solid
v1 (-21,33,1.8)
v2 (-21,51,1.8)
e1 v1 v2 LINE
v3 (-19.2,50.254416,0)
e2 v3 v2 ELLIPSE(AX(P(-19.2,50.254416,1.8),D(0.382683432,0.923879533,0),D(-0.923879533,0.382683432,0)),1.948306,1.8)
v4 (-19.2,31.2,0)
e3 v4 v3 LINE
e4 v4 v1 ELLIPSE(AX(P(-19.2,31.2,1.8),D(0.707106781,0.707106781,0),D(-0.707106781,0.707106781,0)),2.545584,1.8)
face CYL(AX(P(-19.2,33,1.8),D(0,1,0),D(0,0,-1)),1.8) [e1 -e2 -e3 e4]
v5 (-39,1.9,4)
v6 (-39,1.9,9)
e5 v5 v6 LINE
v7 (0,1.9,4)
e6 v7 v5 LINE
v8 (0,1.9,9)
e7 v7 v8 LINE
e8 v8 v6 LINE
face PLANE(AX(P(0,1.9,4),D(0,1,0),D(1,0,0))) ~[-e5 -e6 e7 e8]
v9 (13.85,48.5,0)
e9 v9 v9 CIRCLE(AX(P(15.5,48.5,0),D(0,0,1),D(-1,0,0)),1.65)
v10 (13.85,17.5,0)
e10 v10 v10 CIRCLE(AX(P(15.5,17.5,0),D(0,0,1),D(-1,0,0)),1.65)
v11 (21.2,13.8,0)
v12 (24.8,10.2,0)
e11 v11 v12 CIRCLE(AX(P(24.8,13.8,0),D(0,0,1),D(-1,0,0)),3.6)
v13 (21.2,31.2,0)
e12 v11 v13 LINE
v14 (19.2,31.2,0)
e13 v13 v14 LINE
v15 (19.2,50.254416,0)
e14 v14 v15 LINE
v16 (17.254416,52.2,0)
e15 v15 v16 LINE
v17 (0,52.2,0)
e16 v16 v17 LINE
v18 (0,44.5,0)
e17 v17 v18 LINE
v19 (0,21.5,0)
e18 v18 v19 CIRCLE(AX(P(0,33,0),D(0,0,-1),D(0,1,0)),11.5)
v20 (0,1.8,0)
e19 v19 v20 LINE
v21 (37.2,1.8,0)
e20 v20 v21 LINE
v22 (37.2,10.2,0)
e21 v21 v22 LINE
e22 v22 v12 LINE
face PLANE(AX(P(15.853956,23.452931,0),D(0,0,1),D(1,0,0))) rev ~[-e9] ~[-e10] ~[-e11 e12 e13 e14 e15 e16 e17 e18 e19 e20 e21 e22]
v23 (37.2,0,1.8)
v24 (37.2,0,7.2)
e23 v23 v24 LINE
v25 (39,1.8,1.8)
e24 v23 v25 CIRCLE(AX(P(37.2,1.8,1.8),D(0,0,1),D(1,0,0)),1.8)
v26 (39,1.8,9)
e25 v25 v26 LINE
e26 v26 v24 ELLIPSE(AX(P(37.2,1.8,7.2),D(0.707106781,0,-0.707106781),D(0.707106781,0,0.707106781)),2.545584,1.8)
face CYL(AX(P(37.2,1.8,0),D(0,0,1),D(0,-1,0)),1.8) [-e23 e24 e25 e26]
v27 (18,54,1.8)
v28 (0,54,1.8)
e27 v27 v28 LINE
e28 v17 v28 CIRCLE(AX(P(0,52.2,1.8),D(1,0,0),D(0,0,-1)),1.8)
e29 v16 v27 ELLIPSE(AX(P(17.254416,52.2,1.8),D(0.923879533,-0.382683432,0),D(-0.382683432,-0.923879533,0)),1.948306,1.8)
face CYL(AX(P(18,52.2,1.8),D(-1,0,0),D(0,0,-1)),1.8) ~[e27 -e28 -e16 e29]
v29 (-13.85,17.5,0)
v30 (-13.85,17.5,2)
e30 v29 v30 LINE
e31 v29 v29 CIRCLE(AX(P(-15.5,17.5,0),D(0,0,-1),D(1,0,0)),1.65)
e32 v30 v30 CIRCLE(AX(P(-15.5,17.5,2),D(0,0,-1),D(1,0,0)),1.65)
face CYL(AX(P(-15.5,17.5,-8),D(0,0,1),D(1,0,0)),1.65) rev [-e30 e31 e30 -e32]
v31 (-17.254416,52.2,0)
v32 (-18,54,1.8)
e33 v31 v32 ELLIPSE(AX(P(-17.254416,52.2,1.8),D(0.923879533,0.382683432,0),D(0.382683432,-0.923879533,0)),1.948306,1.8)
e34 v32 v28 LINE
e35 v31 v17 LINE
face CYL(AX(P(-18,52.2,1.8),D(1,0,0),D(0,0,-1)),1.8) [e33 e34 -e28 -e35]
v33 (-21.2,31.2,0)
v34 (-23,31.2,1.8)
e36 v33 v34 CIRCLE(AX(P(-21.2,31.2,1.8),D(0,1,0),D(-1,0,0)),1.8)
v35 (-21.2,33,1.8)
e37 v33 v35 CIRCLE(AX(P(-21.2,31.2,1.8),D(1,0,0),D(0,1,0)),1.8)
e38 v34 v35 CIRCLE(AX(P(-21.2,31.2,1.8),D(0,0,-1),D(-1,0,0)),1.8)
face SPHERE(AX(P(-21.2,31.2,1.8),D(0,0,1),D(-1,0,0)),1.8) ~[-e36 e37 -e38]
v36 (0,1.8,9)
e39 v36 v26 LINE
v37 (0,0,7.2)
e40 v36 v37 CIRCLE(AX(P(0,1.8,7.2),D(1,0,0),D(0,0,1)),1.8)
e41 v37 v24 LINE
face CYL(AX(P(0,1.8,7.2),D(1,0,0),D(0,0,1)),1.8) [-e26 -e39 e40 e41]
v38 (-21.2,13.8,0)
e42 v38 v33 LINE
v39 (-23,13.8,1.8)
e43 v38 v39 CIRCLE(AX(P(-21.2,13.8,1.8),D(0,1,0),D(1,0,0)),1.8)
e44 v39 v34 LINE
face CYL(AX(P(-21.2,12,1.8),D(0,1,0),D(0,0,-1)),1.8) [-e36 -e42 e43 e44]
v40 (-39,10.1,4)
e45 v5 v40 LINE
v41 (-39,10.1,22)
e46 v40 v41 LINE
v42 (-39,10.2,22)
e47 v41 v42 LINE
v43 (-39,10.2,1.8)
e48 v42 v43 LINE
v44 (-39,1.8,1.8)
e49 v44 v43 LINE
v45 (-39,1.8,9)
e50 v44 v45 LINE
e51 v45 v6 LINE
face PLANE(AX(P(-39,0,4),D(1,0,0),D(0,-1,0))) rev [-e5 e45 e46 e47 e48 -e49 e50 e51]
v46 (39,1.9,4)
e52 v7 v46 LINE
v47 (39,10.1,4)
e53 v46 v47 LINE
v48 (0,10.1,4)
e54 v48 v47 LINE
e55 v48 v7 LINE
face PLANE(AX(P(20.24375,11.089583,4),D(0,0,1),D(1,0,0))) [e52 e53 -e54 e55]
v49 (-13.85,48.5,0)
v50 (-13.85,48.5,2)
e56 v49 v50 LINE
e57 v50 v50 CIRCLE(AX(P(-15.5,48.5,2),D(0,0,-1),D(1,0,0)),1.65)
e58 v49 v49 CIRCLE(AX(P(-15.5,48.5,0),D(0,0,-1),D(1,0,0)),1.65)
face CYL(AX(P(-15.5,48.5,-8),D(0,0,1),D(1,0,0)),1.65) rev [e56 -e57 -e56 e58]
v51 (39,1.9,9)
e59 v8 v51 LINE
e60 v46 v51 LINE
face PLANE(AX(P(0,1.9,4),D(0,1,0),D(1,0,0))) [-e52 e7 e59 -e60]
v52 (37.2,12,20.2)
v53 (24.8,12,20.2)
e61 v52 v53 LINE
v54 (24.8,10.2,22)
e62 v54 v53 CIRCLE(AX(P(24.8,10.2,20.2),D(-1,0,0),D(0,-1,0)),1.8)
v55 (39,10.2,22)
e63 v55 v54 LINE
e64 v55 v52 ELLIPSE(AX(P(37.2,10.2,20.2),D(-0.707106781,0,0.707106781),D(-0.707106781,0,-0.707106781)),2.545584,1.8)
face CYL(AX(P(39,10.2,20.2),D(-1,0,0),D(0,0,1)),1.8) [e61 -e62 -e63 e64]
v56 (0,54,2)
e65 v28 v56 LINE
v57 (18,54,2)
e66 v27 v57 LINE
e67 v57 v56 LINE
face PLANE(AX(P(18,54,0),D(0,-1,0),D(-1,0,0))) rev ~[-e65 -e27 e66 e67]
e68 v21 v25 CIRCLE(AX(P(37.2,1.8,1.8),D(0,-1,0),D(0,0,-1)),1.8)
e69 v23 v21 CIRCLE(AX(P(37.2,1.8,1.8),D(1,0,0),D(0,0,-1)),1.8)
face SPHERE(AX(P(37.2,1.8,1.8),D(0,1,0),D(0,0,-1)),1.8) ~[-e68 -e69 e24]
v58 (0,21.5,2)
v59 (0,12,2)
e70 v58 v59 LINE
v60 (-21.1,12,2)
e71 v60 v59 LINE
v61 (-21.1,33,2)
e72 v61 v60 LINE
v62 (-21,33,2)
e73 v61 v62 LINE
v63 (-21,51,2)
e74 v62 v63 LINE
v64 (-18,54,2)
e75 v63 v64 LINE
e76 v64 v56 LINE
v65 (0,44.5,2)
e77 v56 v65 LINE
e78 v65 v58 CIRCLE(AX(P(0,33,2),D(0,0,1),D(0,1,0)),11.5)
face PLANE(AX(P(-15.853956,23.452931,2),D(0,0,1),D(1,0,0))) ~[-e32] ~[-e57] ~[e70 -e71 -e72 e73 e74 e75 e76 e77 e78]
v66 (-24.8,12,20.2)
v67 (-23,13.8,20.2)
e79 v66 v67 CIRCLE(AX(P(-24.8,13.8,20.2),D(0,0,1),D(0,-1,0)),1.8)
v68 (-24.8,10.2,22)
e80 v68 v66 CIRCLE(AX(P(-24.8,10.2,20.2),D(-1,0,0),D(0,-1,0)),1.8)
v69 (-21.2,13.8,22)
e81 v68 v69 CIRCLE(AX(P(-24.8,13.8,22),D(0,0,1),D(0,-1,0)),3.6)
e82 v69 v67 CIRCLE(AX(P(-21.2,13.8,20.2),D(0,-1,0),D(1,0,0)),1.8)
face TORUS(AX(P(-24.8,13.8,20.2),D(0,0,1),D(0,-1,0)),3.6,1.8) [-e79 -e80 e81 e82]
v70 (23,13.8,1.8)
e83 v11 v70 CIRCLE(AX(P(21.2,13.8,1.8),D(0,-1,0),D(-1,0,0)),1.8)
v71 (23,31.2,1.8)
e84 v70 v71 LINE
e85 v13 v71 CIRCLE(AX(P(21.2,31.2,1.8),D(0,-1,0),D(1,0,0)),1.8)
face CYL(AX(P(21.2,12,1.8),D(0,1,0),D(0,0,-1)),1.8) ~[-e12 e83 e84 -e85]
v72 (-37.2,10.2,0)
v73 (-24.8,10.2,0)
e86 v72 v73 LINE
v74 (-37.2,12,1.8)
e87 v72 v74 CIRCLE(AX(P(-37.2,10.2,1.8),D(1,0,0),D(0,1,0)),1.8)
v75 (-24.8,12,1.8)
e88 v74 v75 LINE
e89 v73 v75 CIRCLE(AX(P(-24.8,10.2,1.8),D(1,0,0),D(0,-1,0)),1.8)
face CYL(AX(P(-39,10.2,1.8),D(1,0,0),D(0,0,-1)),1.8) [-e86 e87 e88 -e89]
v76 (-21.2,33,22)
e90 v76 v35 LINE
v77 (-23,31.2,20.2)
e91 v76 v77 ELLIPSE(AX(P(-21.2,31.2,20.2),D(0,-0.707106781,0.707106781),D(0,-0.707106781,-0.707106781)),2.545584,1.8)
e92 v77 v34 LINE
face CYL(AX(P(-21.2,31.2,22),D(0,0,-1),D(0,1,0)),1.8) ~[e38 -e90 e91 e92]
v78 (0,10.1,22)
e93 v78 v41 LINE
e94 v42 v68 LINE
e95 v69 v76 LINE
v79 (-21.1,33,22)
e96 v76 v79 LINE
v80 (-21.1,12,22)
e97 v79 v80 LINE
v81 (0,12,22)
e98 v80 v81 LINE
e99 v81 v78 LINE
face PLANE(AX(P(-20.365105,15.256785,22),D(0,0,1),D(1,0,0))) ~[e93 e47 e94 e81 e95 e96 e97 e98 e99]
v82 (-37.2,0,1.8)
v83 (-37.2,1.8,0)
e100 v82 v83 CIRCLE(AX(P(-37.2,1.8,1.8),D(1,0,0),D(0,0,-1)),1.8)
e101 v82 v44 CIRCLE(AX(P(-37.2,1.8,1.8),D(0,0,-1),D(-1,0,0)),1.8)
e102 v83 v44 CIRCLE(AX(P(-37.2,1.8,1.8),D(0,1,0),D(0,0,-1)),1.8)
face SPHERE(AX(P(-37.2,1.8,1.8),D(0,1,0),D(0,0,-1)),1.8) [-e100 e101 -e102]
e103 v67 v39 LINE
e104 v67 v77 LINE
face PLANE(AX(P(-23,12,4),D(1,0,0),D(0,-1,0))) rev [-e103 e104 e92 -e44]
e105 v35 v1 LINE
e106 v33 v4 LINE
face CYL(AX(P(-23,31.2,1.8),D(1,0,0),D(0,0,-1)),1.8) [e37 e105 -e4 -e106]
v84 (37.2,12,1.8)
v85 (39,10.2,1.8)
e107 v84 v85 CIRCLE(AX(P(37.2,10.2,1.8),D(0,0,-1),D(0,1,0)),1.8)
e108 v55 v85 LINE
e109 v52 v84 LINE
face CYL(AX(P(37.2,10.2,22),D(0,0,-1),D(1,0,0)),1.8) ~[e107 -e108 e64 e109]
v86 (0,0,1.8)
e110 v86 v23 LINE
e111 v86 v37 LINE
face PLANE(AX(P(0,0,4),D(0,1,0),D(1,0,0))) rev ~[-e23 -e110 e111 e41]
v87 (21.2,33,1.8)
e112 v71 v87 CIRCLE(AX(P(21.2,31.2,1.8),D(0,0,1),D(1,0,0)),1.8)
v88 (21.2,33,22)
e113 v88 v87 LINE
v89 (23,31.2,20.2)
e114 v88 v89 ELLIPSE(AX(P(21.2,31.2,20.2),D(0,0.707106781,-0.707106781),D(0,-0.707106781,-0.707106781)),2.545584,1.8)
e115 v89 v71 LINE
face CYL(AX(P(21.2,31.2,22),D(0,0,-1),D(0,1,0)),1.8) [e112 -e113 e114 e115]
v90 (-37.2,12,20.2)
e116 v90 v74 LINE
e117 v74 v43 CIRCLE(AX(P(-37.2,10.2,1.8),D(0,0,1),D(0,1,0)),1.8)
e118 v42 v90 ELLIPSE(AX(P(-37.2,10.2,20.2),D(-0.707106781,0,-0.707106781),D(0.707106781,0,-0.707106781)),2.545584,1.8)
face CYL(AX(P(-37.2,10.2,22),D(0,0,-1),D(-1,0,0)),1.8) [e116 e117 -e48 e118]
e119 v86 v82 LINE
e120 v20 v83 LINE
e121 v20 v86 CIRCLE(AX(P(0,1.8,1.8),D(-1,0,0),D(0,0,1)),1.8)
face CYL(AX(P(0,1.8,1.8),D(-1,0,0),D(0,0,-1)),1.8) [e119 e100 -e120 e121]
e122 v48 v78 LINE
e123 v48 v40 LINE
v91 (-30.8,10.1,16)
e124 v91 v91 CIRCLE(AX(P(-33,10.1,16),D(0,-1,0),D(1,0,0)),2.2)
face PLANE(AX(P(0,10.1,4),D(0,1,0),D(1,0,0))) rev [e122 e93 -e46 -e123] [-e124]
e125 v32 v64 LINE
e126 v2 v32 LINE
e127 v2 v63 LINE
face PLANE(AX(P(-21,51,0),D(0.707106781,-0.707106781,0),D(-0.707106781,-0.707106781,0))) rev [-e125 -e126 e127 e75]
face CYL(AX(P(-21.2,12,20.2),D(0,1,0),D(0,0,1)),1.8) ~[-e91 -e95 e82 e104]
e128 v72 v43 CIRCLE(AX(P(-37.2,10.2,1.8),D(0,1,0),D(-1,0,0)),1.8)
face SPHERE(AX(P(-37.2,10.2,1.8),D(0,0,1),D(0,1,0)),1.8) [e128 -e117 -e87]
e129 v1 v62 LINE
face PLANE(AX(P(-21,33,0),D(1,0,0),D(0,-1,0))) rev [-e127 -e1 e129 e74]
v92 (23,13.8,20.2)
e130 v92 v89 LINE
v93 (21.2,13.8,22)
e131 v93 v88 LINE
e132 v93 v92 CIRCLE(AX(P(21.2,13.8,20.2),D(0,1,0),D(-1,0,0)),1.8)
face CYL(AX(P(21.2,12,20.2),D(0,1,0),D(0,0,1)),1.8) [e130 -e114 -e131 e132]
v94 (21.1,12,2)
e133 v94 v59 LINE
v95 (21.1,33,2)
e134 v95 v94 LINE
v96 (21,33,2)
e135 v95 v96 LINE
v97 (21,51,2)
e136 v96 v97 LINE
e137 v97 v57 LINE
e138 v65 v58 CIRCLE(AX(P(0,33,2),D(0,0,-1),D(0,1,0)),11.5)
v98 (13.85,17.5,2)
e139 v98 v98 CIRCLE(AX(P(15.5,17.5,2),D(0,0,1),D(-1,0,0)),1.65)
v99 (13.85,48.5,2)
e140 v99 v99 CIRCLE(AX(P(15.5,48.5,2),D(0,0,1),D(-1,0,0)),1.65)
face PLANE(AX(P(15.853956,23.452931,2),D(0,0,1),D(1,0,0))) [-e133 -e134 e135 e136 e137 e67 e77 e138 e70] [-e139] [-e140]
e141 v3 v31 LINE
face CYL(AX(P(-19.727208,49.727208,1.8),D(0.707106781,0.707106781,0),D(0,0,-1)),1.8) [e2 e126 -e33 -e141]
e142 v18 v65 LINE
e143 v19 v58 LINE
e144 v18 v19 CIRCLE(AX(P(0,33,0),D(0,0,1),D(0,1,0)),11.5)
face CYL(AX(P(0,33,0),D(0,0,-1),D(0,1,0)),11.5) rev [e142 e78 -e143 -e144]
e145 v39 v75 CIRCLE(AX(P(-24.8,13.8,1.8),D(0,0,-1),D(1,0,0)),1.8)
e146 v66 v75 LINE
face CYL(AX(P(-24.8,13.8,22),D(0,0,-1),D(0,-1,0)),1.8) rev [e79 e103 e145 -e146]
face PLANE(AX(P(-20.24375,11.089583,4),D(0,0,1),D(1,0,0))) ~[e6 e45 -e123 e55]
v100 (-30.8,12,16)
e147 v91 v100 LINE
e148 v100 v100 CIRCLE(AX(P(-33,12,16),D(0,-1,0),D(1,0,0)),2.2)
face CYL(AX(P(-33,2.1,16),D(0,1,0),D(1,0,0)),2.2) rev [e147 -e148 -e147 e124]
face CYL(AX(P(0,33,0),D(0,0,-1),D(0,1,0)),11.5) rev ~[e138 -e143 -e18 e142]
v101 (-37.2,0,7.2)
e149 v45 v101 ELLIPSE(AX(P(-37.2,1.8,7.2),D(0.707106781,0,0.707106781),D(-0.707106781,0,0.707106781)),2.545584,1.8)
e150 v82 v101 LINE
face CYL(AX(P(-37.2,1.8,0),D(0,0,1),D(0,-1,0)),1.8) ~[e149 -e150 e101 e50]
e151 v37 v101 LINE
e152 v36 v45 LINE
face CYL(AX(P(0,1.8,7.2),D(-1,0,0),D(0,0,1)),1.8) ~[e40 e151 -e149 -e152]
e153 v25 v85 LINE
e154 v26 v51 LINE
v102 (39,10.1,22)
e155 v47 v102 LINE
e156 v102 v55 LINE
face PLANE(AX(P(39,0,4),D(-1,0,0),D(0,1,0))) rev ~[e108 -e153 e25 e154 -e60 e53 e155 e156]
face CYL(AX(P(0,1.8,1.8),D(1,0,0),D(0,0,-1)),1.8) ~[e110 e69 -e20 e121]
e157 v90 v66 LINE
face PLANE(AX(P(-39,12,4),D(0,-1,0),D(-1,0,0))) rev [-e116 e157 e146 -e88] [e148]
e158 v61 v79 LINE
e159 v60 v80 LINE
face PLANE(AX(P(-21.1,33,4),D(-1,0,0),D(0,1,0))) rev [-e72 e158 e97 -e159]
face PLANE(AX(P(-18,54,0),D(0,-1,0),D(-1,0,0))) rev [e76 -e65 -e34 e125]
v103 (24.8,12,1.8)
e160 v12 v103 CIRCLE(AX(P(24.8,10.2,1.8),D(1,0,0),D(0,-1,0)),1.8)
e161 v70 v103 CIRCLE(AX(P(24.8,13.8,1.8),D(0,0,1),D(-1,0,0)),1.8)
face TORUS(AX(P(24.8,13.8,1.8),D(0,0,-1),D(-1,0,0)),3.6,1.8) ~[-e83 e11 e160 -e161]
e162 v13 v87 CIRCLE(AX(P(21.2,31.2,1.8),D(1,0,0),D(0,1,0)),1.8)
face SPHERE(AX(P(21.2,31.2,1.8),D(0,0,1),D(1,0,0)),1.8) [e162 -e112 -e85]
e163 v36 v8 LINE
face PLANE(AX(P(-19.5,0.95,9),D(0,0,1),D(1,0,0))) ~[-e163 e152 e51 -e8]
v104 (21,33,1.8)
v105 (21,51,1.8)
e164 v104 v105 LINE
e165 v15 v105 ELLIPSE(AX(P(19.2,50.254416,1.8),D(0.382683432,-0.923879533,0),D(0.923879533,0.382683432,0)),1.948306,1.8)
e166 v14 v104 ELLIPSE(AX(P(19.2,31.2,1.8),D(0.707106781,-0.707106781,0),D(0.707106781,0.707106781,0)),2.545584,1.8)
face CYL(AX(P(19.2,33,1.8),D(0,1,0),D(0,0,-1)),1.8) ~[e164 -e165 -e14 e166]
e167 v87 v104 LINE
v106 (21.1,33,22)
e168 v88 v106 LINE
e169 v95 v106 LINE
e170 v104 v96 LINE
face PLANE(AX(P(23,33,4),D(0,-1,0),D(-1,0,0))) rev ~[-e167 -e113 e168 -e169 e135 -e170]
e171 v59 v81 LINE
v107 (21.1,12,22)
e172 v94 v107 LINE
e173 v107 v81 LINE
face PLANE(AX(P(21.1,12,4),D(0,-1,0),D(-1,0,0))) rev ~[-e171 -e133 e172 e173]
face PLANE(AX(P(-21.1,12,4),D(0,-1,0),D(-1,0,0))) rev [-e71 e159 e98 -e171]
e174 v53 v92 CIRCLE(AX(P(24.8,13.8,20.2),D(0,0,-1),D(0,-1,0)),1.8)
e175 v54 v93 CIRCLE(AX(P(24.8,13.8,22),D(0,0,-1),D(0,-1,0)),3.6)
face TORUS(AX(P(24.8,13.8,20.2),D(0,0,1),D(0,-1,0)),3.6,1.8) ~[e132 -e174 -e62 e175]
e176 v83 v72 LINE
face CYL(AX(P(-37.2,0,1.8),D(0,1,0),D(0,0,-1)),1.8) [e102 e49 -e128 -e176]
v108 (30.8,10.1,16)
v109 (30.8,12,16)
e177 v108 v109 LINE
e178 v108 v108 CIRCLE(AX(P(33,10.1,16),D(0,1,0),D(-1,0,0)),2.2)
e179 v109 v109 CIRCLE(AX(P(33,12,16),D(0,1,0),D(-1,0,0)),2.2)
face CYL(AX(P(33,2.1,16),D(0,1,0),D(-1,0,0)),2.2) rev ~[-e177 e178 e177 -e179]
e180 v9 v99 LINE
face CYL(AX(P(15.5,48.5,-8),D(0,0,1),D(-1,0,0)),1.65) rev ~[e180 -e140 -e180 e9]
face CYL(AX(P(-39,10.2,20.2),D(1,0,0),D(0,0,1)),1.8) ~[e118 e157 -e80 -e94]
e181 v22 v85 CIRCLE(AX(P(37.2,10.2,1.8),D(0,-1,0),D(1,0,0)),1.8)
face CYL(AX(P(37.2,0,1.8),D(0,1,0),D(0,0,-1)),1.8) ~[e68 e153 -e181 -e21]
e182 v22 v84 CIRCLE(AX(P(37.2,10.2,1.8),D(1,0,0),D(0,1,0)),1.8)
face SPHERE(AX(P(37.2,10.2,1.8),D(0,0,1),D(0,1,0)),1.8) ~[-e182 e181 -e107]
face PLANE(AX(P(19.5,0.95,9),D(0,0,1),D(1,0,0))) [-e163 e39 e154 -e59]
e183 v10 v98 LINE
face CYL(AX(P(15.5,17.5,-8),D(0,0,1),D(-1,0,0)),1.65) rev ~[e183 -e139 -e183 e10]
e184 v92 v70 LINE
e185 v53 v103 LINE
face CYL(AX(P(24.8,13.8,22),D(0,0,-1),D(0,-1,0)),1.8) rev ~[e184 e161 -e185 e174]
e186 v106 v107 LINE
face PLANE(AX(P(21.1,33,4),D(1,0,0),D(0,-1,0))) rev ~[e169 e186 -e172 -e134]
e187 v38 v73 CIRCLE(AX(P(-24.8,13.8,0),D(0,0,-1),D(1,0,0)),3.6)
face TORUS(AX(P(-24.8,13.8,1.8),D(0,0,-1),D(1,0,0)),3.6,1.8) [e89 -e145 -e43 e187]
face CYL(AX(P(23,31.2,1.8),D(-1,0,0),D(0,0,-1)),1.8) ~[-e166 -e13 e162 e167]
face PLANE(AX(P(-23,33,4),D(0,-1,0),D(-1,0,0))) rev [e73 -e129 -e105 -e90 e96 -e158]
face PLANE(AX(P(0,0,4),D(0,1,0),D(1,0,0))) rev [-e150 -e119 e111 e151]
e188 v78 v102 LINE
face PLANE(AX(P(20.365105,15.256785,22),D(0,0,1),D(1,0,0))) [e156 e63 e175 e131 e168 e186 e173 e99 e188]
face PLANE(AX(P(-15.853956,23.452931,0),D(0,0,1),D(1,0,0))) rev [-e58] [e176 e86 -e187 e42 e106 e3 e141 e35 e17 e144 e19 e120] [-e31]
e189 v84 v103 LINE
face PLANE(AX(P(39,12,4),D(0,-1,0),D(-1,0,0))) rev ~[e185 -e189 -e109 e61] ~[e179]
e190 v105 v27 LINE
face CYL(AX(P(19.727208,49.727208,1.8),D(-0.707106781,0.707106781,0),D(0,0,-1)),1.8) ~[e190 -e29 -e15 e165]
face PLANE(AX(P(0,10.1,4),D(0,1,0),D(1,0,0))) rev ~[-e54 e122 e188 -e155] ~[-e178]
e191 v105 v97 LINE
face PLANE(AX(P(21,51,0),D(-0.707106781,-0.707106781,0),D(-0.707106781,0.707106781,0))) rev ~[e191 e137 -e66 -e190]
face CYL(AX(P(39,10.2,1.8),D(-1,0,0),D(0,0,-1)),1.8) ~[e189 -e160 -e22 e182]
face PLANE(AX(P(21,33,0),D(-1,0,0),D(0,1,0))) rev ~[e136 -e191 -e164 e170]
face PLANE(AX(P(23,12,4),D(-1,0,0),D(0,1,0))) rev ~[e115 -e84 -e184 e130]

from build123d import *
from build123d import SkipClean  # not in build123d's __all__

# Parameters (mm, degrees)
F1_DEPTH  = 2
F3_DEPTH  = 2
F5_DEPTH  = 18
F6_W      = 39
F6_H      = 1.9
F7_DEPTH  = 5
F9_D      = 3.3
F9_DEPTH  = 8
F9_TIP    = 0.9914200214
F11_D     = 4.4
F11_DEPTH = 8
F11_TIP   = 1.3218933619
F12_R     = 1.8


with BuildPart() as f1:
    # F0 (on Top) → F1 (new body)
    with BuildSketch(Plane.XY):
        with BuildLine():
            Line((0, 21.5), (0, 0))
            Line((0, 0), (39, 0))
            Line((39, 0), (39, 12))
            Line((39, 12), (23, 12))
            Line((23, 12), (23, 33))
            Line((23, 33), (21, 33))
            Line((21, 33), (21, 51))
            Line((21, 51), (18, 54))
            Line((18, 54), (0, 54))
            Line((0, 54), (0, 44.5))
            ThreePointArc((0, 44.5), (11.5, 33), (0, 21.5))
        make_face()
    extrude(amount=F1_DEPTH)

    # F2 (on face) → F3 (join)
    with BuildSketch(Plane.XY.offset(2)):
        Polygon((0, 12), (0, 0), (39, 0), (39, 12), (23, 12), (23, 33), (21.1, 33), (21.1, 12), align=None)
    extrude(amount=F3_DEPTH)

    # F4 (on face) → F5 (join)
    with BuildSketch(Plane.XY.offset(4)):
        Polygon((23, 33), (21.1, 33), (21.1, 12), (0, 12), (0, 10.1), (39, 10.1), (39, 12), (23, 12), align=None)
    extrude(amount=F5_DEPTH)

    # F6 (on face) → F7 (join)
    with BuildSketch(Plane.XY.offset(4)):
        with Locations((19.5, 0.95)):
            Rectangle(F6_W, F6_H)
    extrude(amount=F7_DEPTH)

    # F9
    with Locations(Plane(origin=(0, 0, 0), x_dir=(1, 0, 0), z_dir=(0, 0, -1))):
        with Locations((15.5, -17.5), (15.5, -48.5)):
            Hole(F9_D / 2, depth=F9_DEPTH)
            with Locations((0, 0, -(F9_DEPTH + F9_TIP / 2))):  # 118° drill point
                Cone(0, F9_D / 2, F9_TIP, mode=Mode.SUBTRACT)

    # F11
    with Locations(Plane.XZ.offset(-10.1)):
        with Locations((33, 16)):
            Hole(F11_D / 2, depth=F11_DEPTH)
            with Locations((0, 0, -(F11_DEPTH + F11_TIP / 2))):  # 118° drill point
                Cone(0, F11_D / 2, F11_TIP, mode=Mode.SUBTRACT)

    # F12
    f12_edges = [f1.edges().sort_by_distance(p)[0] for p in [
        (31, 12, 22),
        (39, 12, 11),
        (23, 33, 11),
        (23, 22.5, 22),
        (23, 22.5, 0),
        (9, 54, 0),
        (31, 12, 0),
        (23, 12, 11),
        (39, 6, 0),
        (19.5, 0, 9),
        (19.5, 0, 0),
        (39, 0, 4.5),
        (21, 42, 0),
        (22, 33, 0),
        (19.5, 52.5, 0),
    ]]
    fillet(f12_edges, radius=F12_R)

    # F13: F1 across plane


with BuildPart() as f1_1:
    add(f1.part, clean=False)
    with SkipClean():  # cleaning this boolean's faces spoils the solid; the shape is the same uncleaned
        add(f1.part.mirror(Plane.YZ), clean=False)


solid = f1_1.part
